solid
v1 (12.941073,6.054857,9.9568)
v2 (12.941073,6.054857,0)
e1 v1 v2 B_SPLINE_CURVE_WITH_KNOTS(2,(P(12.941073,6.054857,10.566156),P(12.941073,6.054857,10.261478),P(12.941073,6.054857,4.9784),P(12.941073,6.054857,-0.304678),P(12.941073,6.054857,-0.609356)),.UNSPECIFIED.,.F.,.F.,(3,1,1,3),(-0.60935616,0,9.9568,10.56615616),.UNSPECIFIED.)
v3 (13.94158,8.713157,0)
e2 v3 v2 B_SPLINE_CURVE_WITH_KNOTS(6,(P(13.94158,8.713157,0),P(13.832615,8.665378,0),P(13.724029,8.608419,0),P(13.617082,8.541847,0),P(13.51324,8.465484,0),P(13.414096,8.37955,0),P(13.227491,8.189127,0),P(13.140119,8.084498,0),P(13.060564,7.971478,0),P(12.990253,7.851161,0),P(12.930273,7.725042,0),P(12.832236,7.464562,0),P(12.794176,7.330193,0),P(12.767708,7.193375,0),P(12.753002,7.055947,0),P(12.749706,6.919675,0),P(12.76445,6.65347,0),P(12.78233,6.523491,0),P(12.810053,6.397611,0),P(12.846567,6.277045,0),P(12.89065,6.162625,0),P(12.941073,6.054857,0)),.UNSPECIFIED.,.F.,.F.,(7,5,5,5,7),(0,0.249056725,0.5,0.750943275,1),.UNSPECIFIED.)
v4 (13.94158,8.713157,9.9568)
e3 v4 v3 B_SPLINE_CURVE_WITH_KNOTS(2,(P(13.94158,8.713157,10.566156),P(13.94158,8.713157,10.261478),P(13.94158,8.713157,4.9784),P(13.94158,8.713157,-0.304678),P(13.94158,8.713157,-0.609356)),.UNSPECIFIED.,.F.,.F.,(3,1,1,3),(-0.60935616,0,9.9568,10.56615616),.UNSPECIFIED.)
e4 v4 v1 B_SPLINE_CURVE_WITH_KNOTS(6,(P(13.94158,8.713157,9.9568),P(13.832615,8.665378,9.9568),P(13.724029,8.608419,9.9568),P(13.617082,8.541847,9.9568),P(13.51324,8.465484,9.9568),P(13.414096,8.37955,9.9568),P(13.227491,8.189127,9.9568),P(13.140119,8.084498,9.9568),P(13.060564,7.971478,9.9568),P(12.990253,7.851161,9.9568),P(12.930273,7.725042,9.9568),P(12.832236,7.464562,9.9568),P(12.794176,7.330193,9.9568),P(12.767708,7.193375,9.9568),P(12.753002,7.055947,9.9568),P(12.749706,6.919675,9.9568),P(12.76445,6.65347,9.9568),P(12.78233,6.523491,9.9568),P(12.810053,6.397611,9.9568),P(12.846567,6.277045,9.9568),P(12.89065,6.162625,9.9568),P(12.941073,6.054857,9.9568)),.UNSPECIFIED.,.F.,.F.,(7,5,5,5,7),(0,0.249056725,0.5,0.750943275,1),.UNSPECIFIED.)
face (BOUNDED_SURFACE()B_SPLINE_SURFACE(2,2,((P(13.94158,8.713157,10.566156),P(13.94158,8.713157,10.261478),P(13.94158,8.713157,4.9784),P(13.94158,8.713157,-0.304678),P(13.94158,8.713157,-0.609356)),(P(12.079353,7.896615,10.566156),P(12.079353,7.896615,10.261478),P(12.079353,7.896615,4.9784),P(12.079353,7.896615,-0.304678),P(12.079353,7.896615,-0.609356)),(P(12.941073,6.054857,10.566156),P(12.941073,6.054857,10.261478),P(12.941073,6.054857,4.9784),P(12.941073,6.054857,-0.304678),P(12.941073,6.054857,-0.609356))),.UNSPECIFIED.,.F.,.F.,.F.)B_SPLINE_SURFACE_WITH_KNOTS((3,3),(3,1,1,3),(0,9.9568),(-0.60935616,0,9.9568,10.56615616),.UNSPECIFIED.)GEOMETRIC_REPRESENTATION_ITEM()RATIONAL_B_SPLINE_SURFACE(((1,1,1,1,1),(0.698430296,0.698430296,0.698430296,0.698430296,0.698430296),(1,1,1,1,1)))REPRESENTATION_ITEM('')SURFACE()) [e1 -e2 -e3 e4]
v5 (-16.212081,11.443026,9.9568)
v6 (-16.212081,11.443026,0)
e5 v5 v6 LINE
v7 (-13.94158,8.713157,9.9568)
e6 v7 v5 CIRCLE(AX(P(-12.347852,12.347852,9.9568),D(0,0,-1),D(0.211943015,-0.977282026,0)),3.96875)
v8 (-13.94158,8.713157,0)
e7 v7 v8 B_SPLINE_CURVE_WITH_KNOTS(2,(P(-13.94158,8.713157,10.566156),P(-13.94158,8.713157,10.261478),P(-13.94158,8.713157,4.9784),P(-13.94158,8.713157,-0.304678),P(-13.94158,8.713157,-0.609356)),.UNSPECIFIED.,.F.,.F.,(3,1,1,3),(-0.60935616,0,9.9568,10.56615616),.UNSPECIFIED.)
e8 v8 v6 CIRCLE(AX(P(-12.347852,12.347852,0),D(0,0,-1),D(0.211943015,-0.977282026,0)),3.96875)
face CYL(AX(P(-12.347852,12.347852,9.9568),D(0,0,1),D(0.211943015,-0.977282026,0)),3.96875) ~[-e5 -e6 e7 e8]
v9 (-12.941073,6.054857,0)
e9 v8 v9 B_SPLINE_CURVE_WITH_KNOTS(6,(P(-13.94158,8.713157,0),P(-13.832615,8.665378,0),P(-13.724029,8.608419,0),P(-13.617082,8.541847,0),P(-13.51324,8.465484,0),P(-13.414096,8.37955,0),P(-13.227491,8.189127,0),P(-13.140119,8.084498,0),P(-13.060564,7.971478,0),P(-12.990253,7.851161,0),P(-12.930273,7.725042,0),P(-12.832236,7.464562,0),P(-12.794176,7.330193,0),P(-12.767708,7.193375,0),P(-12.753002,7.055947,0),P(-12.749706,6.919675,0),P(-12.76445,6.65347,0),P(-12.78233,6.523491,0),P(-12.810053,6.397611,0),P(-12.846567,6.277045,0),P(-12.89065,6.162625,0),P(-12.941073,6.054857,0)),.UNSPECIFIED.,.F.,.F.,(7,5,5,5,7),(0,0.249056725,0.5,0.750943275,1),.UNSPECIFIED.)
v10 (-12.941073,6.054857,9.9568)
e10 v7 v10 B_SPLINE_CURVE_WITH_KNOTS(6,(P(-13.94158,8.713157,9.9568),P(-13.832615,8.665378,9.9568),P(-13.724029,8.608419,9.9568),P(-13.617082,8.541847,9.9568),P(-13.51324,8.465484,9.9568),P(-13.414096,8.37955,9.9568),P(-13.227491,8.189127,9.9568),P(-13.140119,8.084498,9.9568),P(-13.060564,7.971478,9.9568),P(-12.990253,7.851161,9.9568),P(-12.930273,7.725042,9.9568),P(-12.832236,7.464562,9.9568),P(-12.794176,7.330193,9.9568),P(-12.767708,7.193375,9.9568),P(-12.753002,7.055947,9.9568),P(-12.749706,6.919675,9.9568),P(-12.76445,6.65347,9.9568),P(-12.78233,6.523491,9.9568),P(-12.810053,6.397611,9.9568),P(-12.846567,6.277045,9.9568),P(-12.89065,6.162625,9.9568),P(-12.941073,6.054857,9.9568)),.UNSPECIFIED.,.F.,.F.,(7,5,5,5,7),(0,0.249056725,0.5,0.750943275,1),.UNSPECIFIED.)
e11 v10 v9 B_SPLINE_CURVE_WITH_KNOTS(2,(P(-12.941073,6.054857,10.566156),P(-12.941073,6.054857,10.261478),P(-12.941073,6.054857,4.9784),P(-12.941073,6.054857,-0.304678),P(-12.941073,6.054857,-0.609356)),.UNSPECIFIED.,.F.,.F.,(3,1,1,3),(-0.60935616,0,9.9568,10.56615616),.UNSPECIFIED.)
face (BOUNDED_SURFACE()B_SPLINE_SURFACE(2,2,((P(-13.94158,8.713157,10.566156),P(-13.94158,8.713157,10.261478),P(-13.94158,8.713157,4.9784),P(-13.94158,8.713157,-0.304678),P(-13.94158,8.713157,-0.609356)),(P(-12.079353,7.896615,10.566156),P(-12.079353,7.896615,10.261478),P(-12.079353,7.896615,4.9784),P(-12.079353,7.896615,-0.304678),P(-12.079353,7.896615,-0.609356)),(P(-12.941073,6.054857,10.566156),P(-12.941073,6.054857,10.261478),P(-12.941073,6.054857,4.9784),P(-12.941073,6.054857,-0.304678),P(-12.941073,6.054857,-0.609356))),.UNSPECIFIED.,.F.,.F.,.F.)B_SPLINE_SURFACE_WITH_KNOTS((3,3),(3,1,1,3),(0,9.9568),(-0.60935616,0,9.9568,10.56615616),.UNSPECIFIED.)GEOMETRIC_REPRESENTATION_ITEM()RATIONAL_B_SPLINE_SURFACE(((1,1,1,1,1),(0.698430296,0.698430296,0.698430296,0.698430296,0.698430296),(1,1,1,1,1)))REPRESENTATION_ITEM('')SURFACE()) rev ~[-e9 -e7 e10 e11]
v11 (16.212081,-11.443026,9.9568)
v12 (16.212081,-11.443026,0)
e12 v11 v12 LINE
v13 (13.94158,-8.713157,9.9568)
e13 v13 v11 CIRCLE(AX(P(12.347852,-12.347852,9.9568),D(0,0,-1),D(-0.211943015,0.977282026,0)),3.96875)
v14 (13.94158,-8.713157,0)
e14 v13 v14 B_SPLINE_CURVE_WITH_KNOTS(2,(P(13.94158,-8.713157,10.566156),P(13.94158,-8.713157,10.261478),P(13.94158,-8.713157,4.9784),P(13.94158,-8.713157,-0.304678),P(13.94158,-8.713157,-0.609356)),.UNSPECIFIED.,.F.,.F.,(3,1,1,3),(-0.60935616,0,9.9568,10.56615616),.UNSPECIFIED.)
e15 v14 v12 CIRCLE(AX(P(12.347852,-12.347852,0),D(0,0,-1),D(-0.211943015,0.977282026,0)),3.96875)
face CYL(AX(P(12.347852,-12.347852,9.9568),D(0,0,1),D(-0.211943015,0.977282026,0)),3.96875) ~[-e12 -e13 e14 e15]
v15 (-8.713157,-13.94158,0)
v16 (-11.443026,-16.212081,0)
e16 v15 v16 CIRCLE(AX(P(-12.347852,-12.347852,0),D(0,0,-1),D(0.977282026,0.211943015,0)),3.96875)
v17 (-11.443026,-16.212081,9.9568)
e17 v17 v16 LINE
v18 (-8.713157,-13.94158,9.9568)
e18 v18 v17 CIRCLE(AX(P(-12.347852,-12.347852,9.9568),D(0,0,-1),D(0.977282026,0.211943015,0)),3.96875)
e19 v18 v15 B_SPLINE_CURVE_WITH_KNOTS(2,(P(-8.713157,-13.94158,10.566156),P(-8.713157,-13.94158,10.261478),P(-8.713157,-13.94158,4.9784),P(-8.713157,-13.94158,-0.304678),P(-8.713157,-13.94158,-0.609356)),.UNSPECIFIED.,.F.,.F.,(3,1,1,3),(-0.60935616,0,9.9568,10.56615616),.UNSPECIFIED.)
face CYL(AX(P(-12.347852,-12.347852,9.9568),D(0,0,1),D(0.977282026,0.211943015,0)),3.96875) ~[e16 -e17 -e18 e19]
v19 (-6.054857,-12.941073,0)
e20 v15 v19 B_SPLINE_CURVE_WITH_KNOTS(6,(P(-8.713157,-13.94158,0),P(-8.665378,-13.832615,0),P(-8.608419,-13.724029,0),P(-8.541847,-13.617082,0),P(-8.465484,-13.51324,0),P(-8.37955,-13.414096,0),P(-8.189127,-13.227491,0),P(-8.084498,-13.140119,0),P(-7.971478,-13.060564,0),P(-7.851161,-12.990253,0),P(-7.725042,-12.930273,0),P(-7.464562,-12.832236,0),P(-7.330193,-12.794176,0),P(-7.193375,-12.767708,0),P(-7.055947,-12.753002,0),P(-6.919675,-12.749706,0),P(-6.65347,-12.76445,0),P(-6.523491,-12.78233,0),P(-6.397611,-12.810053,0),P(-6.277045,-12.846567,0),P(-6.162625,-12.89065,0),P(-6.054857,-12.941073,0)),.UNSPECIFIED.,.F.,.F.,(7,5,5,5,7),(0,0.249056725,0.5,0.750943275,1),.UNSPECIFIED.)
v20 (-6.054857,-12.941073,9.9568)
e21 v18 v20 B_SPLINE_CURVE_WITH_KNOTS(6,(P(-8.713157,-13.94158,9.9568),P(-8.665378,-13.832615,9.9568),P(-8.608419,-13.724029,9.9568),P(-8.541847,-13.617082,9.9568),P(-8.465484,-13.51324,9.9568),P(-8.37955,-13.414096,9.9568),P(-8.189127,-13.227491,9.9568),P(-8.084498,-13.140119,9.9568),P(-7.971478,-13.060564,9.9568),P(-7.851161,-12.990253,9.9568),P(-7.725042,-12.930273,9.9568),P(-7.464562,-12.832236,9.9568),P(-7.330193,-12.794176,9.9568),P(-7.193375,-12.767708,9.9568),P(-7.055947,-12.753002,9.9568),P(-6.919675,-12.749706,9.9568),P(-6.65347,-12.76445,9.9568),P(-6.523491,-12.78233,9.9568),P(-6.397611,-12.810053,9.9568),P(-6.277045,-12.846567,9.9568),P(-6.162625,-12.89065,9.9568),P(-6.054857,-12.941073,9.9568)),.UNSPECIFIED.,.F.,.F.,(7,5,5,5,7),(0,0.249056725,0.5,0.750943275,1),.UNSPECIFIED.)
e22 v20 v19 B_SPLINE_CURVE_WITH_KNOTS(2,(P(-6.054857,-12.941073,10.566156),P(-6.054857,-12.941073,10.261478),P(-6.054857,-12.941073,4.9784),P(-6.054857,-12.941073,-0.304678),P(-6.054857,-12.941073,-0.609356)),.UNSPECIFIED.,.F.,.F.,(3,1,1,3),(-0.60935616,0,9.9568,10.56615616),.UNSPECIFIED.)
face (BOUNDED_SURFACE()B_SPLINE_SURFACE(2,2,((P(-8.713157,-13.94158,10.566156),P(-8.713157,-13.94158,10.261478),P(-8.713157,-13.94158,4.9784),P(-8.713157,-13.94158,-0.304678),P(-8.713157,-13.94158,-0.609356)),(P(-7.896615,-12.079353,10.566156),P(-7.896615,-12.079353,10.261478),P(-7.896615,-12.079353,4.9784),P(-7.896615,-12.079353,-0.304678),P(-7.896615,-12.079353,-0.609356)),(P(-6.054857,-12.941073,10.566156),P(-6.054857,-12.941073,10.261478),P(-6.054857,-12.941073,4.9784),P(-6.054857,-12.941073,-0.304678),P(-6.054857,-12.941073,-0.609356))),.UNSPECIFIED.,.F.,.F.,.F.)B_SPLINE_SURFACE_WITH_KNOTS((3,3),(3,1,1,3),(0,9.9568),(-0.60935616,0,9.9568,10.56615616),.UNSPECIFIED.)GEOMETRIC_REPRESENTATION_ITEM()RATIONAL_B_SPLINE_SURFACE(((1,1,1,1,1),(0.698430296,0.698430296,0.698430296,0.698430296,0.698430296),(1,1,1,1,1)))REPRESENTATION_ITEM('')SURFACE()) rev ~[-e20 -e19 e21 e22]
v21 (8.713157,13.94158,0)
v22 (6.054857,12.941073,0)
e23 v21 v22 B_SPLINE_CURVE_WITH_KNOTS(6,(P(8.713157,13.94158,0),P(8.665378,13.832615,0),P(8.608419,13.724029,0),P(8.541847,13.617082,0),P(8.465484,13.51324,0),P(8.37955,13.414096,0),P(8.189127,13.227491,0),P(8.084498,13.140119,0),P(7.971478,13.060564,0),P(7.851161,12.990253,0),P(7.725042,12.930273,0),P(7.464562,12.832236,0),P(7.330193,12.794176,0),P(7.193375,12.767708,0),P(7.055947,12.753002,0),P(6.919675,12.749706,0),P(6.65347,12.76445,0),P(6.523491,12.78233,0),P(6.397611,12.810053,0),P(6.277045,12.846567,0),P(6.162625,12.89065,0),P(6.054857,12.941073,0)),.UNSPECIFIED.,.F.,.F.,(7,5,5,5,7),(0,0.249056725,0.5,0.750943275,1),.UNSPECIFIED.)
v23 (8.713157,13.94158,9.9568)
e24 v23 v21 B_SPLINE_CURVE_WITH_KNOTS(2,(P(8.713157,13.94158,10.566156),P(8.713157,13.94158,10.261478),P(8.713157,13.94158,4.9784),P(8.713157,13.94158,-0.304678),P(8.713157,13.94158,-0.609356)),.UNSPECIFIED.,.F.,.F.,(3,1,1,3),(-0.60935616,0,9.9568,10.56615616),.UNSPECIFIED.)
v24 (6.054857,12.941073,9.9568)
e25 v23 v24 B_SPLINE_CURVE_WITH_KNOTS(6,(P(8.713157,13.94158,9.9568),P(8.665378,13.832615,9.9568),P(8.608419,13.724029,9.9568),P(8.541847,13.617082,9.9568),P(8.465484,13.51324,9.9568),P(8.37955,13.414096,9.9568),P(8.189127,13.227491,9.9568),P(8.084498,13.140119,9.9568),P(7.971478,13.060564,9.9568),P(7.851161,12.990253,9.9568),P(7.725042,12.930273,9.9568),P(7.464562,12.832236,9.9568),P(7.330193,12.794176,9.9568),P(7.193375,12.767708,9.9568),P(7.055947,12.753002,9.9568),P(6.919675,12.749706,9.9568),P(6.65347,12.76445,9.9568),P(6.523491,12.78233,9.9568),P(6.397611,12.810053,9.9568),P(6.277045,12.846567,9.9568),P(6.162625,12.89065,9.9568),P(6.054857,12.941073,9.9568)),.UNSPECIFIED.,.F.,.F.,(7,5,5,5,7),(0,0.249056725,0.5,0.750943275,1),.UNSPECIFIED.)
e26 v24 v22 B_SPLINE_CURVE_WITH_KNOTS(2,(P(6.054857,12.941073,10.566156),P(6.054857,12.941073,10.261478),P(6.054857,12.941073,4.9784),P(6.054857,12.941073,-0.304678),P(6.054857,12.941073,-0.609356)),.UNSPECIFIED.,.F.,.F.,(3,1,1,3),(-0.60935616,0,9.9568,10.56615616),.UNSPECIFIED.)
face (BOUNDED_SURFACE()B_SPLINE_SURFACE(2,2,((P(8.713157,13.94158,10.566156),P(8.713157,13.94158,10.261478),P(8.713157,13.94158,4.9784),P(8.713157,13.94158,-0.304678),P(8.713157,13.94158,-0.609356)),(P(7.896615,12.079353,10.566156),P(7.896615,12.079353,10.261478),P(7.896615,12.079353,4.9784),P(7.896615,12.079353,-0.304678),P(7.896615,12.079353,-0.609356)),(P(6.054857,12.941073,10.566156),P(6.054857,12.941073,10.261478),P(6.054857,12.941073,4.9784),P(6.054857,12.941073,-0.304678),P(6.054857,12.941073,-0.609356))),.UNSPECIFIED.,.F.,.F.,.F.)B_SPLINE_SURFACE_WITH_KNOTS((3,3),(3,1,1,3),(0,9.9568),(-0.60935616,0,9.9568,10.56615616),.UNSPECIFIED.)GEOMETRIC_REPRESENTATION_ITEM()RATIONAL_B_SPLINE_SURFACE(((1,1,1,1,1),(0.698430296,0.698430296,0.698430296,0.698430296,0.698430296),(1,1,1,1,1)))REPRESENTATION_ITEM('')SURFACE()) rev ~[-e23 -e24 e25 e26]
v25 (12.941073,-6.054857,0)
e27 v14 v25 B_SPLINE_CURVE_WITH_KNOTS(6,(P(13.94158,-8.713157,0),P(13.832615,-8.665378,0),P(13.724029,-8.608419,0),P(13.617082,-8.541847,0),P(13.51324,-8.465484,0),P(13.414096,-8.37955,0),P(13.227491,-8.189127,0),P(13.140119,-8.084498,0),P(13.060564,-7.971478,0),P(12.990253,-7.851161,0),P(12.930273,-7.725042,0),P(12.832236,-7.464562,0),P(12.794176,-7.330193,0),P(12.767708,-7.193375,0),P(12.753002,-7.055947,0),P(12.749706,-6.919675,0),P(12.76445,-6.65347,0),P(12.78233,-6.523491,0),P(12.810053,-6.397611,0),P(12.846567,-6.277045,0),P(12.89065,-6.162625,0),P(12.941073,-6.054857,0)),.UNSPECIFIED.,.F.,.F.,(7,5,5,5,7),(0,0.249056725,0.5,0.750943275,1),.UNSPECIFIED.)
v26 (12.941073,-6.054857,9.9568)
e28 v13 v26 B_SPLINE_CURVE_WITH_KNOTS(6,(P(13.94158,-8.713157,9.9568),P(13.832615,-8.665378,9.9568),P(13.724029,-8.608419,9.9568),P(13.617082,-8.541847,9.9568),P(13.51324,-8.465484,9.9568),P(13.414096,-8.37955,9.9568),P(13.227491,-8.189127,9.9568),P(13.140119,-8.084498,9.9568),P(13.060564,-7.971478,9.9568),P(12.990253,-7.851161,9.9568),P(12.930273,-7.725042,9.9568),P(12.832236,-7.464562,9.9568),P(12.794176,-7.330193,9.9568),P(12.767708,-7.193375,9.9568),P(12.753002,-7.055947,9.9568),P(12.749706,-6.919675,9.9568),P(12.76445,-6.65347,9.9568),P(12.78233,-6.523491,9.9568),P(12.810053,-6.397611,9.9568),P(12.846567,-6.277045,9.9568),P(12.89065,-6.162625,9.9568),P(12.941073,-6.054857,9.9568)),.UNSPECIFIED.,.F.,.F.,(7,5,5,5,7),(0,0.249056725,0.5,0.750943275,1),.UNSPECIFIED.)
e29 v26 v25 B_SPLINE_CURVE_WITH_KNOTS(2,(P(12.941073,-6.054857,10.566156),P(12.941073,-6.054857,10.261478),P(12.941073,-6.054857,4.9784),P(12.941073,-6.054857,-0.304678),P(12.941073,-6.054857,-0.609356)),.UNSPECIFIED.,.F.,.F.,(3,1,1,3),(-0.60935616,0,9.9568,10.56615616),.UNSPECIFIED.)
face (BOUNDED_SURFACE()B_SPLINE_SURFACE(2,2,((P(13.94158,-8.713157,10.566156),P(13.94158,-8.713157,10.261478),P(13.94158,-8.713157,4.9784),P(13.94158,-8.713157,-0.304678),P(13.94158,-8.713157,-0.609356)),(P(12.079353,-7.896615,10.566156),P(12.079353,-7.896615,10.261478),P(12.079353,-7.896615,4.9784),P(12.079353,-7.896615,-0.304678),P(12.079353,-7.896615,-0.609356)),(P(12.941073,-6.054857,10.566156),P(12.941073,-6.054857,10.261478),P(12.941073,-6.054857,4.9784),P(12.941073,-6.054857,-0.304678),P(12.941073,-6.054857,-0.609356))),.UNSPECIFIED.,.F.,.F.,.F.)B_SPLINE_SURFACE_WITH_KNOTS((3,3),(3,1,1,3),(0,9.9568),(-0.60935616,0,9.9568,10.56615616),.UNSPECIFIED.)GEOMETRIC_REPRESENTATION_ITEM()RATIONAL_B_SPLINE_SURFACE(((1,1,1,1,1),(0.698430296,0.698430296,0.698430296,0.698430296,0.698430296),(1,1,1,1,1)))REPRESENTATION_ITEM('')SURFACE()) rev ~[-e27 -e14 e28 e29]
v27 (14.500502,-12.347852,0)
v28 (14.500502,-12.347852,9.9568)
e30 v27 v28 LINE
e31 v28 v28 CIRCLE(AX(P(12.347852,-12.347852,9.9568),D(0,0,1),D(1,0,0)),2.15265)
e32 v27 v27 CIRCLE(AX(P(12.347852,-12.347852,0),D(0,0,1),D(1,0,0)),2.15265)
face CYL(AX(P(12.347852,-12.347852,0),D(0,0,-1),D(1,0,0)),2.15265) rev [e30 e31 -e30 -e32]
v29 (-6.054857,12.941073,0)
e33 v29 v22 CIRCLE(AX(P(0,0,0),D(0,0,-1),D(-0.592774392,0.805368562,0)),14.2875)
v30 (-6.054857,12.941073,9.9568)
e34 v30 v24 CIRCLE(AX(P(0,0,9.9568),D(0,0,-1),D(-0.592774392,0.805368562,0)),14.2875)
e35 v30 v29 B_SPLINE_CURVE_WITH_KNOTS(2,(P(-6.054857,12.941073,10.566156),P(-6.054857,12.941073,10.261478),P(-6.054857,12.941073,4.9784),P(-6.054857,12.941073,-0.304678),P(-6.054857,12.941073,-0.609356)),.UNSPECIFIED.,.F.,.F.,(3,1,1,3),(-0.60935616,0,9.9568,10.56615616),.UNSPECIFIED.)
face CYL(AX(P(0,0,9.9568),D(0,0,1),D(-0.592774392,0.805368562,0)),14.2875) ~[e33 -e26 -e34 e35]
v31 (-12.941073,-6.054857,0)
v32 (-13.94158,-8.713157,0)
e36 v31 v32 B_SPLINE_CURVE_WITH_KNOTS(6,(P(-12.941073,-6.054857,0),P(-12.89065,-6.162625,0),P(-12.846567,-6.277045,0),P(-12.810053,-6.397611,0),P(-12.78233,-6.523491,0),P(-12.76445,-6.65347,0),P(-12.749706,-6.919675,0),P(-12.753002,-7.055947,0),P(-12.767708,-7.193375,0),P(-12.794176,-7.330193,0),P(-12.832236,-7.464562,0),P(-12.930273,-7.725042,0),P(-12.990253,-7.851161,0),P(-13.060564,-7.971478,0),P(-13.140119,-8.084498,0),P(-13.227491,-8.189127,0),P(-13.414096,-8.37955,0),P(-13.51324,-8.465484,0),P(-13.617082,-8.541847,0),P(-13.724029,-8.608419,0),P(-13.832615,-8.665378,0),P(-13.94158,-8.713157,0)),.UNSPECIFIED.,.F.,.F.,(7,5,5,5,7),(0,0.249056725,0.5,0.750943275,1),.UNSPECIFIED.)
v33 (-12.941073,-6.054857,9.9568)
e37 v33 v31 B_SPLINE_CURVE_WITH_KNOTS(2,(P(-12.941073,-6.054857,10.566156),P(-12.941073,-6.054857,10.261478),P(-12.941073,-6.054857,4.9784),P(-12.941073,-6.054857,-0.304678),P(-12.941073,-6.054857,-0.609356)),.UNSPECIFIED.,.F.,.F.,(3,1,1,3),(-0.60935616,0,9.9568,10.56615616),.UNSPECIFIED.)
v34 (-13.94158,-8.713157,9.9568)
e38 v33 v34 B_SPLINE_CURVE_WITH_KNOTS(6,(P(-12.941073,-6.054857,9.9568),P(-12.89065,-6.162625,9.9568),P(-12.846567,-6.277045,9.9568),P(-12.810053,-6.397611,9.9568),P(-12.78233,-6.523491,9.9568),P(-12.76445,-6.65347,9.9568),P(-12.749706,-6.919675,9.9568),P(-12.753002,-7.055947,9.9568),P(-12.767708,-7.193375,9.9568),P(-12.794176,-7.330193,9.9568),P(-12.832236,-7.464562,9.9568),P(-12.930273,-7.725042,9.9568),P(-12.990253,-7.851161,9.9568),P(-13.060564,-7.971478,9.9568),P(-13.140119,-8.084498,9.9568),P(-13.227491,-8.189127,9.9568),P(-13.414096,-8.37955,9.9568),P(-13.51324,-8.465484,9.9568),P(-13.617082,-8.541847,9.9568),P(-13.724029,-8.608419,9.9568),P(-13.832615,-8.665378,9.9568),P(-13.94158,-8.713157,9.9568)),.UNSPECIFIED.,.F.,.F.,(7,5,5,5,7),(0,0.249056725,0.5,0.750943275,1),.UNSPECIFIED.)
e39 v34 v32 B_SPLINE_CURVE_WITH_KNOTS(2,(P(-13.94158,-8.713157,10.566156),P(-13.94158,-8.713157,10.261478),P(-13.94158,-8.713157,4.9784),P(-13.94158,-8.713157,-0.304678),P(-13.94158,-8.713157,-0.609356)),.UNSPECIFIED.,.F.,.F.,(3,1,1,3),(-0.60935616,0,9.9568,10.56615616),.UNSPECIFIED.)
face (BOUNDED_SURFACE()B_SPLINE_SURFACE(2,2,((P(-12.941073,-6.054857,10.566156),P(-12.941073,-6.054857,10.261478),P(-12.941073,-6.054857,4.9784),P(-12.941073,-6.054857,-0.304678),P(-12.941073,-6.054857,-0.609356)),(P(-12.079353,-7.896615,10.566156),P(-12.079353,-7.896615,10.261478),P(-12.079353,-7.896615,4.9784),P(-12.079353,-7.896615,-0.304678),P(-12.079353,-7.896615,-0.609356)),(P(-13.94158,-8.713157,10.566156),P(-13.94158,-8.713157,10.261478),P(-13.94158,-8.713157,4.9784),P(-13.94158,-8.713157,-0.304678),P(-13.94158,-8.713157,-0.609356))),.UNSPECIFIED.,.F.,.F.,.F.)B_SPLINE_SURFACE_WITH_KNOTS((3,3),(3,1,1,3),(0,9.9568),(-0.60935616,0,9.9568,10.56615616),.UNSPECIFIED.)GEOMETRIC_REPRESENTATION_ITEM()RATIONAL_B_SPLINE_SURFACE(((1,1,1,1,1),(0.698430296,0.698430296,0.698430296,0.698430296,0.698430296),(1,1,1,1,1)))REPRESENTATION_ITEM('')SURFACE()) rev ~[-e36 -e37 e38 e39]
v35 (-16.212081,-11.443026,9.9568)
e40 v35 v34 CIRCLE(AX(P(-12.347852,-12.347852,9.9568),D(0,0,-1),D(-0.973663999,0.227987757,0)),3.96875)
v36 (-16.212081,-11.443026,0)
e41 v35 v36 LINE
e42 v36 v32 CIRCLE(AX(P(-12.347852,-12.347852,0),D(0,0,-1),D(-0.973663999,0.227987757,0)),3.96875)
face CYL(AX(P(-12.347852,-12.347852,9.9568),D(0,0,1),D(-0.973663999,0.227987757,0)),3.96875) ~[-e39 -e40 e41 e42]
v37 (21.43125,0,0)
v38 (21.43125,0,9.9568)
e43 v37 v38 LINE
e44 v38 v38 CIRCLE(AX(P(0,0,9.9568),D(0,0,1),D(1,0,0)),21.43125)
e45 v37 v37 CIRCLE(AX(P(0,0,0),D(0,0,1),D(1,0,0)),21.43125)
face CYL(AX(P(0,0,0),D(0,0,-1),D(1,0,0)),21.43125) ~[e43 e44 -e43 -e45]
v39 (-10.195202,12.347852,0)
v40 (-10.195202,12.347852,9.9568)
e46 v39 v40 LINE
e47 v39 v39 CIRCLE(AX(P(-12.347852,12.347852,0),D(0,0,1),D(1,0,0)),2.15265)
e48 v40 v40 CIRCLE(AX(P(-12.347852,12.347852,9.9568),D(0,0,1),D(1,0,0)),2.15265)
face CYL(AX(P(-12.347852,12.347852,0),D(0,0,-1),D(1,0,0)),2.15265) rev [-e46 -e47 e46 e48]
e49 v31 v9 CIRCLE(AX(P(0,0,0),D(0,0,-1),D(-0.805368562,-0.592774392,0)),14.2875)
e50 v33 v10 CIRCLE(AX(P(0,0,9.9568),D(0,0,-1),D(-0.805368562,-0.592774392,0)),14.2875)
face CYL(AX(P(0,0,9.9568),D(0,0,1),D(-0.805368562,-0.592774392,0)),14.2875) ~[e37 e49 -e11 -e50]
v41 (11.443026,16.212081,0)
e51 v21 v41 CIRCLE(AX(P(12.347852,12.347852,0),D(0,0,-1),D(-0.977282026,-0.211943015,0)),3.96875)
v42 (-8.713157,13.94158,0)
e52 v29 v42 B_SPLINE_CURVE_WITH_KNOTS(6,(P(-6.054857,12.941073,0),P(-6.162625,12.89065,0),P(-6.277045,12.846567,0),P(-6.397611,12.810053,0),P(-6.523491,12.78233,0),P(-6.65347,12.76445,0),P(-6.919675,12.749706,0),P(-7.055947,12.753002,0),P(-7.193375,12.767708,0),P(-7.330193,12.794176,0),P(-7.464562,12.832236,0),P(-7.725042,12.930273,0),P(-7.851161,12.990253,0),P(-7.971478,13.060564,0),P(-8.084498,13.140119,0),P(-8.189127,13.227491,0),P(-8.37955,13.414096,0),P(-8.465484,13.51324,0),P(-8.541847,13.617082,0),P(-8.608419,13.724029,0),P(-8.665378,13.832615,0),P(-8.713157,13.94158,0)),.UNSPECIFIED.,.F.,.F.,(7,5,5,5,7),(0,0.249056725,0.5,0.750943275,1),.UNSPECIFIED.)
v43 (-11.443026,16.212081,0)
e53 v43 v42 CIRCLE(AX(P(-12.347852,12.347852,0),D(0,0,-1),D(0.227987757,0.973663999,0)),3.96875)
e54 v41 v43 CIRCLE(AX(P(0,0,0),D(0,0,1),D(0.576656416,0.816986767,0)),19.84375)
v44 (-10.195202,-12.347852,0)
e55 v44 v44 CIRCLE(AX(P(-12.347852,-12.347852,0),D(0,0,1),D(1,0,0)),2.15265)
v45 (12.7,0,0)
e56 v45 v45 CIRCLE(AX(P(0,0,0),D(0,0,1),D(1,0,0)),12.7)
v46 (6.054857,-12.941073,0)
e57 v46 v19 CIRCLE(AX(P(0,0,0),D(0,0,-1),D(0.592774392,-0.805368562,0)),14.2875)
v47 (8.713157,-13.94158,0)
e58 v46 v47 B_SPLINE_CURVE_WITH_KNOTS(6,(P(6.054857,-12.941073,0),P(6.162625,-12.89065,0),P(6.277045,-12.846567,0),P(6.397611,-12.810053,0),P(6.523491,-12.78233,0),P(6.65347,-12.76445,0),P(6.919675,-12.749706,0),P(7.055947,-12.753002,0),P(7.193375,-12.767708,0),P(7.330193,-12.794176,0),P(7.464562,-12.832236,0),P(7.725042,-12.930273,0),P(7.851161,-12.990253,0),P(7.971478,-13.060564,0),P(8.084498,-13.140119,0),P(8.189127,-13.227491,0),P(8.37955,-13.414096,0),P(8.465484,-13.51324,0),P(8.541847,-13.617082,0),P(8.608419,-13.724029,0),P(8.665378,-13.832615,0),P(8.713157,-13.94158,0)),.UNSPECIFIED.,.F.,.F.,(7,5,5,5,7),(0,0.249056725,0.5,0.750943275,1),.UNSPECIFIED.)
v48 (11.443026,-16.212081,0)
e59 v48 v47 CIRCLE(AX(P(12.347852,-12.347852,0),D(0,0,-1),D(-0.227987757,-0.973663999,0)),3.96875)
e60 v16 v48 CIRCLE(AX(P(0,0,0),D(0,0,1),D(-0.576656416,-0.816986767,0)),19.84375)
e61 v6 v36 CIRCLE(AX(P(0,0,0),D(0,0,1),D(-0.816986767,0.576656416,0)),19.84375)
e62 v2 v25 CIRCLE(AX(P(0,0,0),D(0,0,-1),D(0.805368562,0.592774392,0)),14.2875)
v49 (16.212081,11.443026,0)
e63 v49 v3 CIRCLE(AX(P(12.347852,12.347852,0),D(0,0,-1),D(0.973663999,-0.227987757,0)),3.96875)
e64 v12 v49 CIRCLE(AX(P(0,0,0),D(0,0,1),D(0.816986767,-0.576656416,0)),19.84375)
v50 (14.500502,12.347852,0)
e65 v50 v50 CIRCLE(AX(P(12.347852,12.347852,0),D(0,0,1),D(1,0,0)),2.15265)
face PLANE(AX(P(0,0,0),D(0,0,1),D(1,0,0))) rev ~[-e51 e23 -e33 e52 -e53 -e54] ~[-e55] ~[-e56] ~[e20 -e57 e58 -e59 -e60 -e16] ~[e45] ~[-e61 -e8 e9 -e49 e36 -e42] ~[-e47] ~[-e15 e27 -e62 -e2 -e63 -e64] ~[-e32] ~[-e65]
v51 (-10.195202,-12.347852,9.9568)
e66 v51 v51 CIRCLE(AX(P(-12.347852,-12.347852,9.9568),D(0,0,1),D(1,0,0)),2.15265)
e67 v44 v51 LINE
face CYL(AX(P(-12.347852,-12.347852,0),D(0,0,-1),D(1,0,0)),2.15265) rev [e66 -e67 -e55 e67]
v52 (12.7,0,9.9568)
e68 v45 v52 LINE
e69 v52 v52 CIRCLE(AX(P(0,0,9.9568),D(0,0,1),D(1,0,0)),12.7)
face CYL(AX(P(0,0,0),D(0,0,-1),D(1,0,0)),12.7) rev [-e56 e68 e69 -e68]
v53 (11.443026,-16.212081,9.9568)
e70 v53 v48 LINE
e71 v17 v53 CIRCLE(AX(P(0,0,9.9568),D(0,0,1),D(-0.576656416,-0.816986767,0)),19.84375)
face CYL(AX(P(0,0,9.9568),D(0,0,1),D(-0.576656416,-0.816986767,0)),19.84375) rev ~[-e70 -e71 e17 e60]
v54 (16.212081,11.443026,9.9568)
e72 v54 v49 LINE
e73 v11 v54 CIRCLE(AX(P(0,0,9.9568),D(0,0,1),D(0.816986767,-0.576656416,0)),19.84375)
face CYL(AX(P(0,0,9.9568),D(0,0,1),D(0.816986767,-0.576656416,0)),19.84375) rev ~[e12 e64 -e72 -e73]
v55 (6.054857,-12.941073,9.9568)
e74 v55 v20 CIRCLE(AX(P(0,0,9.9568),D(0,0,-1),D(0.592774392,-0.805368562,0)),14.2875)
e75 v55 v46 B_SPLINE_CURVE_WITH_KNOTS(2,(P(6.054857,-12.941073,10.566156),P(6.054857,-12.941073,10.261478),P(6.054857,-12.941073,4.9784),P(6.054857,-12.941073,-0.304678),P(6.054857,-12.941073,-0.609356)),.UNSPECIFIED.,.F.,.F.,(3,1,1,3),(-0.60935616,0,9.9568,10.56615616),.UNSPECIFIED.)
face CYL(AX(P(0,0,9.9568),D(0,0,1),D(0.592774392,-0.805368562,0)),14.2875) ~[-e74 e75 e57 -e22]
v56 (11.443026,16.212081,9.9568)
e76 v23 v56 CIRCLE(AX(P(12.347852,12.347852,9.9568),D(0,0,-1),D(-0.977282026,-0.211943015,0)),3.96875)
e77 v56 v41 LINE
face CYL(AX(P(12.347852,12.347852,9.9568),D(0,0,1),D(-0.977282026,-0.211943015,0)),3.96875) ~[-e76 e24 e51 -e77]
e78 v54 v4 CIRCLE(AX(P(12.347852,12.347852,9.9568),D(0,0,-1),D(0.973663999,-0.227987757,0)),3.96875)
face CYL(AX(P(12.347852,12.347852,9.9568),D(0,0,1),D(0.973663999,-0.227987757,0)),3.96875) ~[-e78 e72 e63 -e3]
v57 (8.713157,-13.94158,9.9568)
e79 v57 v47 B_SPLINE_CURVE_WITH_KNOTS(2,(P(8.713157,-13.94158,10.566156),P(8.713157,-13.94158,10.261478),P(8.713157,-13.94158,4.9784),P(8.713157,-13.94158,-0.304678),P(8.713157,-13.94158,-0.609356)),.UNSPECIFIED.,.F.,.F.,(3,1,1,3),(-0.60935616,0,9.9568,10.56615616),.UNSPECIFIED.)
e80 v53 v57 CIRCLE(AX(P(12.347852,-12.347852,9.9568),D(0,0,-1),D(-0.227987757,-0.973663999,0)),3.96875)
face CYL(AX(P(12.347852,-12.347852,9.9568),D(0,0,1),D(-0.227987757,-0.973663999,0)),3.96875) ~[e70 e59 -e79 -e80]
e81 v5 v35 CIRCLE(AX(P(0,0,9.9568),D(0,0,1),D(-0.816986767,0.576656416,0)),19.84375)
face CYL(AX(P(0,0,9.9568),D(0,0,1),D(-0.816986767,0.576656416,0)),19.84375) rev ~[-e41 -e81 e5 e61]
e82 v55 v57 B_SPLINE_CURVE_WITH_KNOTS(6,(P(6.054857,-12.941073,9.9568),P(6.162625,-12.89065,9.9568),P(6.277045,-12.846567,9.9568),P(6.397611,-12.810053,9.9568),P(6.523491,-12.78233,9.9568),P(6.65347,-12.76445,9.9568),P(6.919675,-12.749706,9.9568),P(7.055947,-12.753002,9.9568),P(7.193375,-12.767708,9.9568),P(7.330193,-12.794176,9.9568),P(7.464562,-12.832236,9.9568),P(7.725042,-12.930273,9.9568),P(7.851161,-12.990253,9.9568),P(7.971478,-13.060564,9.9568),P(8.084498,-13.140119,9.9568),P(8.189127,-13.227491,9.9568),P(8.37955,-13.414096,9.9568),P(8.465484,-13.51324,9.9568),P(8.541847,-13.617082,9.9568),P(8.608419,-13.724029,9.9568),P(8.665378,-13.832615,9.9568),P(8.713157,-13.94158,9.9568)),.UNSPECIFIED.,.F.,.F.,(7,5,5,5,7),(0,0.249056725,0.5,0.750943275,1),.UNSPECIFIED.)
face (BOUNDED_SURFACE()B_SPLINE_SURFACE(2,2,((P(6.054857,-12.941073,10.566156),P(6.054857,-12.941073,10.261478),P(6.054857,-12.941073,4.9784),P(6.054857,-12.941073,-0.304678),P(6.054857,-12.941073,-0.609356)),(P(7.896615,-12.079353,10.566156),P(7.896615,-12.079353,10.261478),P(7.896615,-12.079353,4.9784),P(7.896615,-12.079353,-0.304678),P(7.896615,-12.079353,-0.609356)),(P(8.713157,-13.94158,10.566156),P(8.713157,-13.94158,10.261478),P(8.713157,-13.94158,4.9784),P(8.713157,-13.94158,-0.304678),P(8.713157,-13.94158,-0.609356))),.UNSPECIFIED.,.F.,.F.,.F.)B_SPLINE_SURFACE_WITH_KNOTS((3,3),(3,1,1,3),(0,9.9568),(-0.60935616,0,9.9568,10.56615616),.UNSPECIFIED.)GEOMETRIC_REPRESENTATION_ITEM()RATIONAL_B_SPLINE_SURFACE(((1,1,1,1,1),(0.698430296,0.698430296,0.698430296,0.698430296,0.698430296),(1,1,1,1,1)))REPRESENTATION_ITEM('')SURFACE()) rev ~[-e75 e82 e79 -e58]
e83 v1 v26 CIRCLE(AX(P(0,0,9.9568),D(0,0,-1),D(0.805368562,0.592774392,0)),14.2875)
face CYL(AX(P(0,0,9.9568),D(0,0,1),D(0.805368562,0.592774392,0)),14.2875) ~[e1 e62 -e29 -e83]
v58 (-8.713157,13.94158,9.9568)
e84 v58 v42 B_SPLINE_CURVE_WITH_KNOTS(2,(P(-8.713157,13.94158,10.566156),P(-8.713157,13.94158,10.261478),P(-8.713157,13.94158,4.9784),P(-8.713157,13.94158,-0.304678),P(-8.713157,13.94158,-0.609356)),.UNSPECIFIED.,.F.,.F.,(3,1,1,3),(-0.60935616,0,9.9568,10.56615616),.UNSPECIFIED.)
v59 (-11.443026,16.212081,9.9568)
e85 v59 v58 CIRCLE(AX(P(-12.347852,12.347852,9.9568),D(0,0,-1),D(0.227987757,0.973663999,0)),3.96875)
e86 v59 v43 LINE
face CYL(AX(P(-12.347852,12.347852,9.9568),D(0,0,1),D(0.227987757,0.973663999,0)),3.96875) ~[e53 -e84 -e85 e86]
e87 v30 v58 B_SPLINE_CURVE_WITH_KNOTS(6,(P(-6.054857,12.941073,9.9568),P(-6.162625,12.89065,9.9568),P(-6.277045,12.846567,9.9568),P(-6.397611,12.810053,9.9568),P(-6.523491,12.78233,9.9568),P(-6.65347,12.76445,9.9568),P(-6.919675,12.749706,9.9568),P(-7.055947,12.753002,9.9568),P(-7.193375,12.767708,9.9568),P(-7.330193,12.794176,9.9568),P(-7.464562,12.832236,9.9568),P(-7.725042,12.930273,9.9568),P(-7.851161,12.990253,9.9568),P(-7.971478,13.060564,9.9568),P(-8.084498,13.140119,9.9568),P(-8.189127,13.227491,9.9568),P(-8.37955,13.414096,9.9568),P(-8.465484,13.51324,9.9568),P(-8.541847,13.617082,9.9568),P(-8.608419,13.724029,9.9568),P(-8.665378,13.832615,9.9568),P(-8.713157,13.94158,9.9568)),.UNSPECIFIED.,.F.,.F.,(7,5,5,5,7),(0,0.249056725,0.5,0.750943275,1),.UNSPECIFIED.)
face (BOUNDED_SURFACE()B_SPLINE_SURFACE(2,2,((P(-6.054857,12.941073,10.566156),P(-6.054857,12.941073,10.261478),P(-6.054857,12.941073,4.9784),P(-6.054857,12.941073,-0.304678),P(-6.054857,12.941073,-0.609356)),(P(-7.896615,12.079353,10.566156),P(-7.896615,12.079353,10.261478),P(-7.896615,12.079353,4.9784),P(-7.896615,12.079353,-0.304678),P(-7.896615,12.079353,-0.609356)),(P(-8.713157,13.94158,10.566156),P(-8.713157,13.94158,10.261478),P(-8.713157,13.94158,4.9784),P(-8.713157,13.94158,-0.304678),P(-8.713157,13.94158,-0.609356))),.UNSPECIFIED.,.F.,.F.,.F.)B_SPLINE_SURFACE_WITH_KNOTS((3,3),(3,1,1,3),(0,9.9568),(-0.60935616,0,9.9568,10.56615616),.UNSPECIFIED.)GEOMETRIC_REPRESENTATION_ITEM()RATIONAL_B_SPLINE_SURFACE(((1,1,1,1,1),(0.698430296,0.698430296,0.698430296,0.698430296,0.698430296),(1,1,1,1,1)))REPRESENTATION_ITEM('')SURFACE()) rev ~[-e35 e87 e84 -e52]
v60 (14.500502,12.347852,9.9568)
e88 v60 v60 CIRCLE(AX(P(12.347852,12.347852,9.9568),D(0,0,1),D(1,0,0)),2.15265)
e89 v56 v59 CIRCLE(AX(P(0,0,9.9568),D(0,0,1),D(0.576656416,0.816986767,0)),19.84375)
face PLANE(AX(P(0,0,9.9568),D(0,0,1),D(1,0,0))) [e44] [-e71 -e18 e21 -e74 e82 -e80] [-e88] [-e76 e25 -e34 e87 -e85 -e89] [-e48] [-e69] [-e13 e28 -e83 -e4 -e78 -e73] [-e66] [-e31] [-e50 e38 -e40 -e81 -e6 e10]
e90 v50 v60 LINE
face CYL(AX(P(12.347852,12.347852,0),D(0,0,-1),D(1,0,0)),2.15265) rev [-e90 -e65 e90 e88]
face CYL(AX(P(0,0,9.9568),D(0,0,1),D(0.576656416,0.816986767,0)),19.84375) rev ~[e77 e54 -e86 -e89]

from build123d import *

# Parameters (mm, degrees)
F0_R            = 21.43125
F0_R_2          = 2.15265
F0_R_3          = 12.7
F1_DEPTH        = 9.9568
F3_DEPTH        = 9.9568
F3_COPIES_COUNT = 4
F4_R            = 1.984375


# Not quite as in the source:
# - a pattern or mirror of a feature is missing from the dataset's text; its kind, count and spacing are read off the source's solid


with BuildPart() as f1:
    # F0 (on Top) → F1 (new body)
    with BuildSketch(Plane.XY):
        Circle(F0_R)
        with Locations((-12.3478521665, -12.3478521665)):
            Circle(F0_R_2, mode=Mode.SUBTRACT)
        with Locations((12.3478521665, -12.3478521665)):
            Circle(F0_R_2, mode=Mode.SUBTRACT)
        with Locations((-12.3478521665, 12.3478521665)):
            Circle(F0_R_2, mode=Mode.SUBTRACT)
        Circle(F0_R_3, mode=Mode.SUBTRACT)
        with Locations((12.3478521665, 12.3478521665)):
            Circle(F0_R_2, mode=Mode.SUBTRACT)
    extrude(amount=F1_DEPTH)

    # F2 (on face) → F3 (cut, through all)
    with BuildSketch(Plane.XY.offset(9.9568)):
        with BuildLine():
            ThreePointArc((8.4692641257, 11.5067033254), (8.9929440308, 14.4681276118), (11.4430257563, 16.212081162))
            ThreePointArc((11.4430257563, 16.212081162), (0, 19.84375), (-11.4430257563, 16.212081162))
            ThreePointArc((-11.4430257563, 16.212081162), (-8.9929440308, 14.4681276118), (-8.4692641257, 11.5067033254))
            ThreePointArc((-8.4692641257, 11.5067033254), (0, 14.2875), (8.4692641257, 11.5067033254))
        make_face()
    f3 = extrude(amount=-F3_DEPTH, mode=Mode.SUBTRACT)

    # F3_copies: F3 ×4 about axis
    f3_copies_axis = Axis((0, 0, 0), (0, 0, 1))
    for i in range(1, F3_COPIES_COUNT):
        add(f3.rotate(f3_copies_axis, i * 360 / F3_COPIES_COUNT), mode=Mode.SUBTRACT)

    # F4
    f4_edges = [f1.edges().sort_by_distance(p)[0] for p in [
        (8.469264, 11.506703, 4.9784),
        (-8.469264, 11.506703, 4.9784),
        (8.469264, -11.506703, 4.9784),
        (-8.469264, -11.506703, 4.9784),
        (11.506703, 8.469264, 4.9784),
        (11.506703, -8.469264, 4.9784),
        (-11.506703, -8.469264, 4.9784),
        (-11.506703, 8.469264, 4.9784),
    ]]
    fillet(f4_edges, radius=F4_R)


solid = f1.part
